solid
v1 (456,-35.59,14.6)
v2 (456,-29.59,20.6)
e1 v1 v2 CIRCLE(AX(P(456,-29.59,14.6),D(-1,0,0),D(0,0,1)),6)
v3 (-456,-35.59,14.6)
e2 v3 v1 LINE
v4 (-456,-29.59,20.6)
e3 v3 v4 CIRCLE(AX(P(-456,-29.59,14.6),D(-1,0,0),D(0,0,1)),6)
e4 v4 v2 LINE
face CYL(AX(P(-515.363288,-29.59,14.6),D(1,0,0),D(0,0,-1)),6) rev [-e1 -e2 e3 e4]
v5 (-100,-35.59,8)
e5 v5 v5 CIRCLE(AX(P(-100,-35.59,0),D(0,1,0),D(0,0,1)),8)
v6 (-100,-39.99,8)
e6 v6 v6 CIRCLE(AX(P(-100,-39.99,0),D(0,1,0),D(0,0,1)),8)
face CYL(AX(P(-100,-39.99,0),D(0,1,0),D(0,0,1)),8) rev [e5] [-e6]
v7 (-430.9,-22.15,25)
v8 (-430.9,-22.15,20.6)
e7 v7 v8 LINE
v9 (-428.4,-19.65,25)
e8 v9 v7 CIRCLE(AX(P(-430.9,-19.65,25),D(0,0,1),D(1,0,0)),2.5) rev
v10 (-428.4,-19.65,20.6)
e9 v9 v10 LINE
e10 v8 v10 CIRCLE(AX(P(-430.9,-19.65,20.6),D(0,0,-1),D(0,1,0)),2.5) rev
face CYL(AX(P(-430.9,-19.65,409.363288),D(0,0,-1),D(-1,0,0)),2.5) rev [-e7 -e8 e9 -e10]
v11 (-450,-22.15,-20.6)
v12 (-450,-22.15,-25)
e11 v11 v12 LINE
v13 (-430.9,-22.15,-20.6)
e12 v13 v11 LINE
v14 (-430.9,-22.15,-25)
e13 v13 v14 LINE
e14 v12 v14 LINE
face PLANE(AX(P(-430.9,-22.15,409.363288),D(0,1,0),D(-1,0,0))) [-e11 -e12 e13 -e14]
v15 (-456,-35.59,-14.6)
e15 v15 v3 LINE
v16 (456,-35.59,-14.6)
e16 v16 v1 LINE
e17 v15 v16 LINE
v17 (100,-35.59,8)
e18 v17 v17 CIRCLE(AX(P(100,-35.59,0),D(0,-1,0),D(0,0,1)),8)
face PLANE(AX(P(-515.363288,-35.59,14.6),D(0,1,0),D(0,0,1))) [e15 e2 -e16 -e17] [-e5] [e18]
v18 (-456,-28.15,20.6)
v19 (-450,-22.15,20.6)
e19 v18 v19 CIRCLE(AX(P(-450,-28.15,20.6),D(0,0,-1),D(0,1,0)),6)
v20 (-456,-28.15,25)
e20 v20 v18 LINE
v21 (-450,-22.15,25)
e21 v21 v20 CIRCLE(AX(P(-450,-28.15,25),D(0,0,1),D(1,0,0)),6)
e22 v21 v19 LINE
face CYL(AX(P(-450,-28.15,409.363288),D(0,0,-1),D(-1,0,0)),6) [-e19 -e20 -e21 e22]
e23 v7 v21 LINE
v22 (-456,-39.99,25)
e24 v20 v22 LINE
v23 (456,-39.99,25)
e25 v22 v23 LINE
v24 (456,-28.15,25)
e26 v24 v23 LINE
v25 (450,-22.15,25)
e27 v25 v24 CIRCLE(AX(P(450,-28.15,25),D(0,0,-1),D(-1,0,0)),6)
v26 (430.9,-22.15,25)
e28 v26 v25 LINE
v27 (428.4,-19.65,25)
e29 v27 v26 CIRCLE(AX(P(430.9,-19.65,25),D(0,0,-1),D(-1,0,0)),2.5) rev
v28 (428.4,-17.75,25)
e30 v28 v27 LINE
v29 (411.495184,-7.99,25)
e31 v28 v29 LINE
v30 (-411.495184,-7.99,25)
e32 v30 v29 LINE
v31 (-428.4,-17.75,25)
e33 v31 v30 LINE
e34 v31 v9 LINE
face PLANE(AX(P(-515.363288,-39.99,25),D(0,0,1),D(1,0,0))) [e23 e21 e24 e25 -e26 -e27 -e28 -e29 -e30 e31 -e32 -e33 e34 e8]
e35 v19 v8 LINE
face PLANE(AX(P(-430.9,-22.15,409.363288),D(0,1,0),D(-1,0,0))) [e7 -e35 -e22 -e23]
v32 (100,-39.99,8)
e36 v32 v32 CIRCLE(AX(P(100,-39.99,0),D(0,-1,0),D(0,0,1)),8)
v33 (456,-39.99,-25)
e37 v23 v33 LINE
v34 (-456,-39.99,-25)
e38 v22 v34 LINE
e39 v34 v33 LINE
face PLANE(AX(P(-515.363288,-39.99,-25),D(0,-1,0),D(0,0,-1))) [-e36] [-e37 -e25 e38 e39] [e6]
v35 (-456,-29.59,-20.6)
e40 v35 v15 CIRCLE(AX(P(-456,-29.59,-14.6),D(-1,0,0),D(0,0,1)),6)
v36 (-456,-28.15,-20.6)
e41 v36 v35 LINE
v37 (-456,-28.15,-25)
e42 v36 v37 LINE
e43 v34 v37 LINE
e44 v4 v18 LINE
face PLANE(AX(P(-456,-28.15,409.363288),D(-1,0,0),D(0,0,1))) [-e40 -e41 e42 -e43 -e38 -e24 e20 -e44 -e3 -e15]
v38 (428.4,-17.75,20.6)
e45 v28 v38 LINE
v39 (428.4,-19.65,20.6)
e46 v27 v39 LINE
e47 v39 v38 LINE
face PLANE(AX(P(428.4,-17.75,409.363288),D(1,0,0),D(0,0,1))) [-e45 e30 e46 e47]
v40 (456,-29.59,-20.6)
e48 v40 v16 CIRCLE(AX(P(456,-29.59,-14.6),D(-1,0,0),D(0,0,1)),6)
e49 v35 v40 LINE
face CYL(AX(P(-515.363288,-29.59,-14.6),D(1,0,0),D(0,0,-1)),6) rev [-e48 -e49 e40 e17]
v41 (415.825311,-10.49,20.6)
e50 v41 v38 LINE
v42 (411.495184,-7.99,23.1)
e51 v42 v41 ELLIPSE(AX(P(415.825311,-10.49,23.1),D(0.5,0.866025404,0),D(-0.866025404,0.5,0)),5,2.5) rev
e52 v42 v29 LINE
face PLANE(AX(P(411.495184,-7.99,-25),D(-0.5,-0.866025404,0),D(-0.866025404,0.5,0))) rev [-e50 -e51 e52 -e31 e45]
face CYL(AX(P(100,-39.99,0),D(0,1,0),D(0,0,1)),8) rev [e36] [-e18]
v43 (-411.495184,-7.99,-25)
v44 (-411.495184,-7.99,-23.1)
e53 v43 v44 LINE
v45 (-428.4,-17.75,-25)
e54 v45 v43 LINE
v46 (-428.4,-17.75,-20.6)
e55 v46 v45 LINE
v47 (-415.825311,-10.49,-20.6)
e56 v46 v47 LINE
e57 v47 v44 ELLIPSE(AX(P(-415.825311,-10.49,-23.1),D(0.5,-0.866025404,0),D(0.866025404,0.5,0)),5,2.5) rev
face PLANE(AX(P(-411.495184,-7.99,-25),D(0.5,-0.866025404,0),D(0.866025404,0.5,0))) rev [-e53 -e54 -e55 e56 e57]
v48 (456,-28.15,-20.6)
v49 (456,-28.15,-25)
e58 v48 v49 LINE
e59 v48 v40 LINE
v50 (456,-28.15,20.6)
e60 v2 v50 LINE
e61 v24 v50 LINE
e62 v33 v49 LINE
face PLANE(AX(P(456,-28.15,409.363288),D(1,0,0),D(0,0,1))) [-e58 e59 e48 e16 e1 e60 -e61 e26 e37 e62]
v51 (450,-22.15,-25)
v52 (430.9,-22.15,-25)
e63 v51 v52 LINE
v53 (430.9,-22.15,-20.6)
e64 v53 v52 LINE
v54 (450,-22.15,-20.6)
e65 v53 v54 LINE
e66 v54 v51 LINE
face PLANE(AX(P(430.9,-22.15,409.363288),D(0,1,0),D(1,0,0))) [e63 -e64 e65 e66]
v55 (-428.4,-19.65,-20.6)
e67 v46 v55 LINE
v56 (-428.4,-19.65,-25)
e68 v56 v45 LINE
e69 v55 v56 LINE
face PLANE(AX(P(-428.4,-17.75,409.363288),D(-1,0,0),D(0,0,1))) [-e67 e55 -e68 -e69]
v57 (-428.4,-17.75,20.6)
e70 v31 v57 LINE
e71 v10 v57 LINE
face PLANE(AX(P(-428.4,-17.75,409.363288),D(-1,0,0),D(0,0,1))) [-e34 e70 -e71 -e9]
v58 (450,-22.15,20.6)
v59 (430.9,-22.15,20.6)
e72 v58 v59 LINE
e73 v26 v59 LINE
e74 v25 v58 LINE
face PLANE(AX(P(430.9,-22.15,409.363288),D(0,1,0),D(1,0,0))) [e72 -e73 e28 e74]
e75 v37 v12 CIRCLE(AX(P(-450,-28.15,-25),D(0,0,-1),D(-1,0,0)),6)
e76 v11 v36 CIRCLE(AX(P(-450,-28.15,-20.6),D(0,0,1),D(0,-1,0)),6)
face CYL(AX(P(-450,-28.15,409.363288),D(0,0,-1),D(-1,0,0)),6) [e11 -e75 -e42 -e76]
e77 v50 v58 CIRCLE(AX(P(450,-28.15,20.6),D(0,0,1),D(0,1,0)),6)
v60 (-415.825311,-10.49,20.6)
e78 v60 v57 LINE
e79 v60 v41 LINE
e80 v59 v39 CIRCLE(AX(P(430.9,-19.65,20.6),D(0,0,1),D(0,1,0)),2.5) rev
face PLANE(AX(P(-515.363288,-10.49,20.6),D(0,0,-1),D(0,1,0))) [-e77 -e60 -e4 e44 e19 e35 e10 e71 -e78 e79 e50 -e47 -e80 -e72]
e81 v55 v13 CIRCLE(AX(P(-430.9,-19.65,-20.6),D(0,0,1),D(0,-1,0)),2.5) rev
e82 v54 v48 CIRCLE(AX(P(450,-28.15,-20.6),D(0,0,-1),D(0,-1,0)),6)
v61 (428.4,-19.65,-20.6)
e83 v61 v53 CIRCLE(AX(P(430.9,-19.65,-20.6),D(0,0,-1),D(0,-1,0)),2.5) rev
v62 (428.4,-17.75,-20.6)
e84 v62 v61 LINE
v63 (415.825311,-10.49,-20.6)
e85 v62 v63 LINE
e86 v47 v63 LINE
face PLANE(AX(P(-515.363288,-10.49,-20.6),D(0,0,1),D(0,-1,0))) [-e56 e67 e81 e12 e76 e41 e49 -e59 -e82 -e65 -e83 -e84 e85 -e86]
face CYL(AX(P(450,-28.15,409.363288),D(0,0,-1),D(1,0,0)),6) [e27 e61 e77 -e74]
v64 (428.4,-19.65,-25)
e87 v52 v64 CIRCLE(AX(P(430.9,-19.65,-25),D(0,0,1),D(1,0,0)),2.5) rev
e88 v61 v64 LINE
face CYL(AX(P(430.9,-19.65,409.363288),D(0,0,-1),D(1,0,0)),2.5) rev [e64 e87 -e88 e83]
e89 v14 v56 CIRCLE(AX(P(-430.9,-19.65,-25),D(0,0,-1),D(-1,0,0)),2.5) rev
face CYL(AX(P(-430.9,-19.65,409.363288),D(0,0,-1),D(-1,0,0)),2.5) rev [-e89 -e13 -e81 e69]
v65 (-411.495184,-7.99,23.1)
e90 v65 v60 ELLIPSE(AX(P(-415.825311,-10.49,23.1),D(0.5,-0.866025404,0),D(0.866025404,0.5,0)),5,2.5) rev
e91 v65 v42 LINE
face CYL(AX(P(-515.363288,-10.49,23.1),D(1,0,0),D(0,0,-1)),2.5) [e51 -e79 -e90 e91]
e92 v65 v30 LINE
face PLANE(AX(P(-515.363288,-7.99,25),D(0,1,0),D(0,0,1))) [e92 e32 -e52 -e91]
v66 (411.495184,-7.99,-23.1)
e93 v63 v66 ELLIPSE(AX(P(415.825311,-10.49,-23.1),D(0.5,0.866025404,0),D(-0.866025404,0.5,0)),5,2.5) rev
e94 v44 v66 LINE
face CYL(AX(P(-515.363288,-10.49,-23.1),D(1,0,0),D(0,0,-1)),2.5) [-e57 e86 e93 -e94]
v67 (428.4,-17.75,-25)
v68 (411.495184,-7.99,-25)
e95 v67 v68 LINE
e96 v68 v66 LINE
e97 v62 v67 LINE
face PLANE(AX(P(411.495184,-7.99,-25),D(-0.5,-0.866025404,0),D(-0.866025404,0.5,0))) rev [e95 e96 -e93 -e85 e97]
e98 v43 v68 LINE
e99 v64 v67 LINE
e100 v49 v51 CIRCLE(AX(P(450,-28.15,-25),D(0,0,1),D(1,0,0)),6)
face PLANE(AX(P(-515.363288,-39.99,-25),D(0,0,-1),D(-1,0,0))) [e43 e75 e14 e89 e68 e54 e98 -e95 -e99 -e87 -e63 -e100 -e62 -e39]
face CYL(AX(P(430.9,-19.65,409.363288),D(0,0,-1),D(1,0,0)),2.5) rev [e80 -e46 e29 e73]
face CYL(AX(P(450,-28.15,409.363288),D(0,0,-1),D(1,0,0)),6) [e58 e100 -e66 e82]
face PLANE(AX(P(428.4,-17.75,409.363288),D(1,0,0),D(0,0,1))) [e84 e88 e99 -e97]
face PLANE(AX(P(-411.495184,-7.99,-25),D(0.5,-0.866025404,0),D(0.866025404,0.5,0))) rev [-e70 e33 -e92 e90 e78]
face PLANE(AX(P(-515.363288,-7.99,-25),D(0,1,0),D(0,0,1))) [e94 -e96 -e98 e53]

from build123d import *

# Parameters (mm, degrees)
EXTRUDE_1_DEPTH     = 456
SKETCH_2_R          = 8
CUT_EXTRUDE_1_DEPTH = 458.51804336
OTHER_START         = -25
OTHER_1_DEPTH       = 50
CUT_EXTRUDE_2_DEPTH = 461.472800608


# Read off the part's stored shape, not the designer's step: Полость1
with BuildPart() as part:
    # Эскиз1 → Бобышка-Вытянуть1 (new body)
    with BuildSketch(Plane(origin=(0, 0, 0), x_dir=(0, 0, -1), z_dir=(1, 0, 0))):
        with BuildLine():
            Line((25, -39.99), (-25, -39.99))
            Line((-25, -39.99), (-25, -7.99))
            Line((-25, -7.99), (-23.1, -7.99))
            ThreePointArc((-23.1, -7.99), (-21.332233047, -8.722233047), (-20.6, -10.49))
            Line((-20.6, -10.49), (-20.6, -29.59))
            ThreePointArc((-20.6, -29.59), (-18.842640687, -33.832640687), (-14.6, -35.59))
            Line((-14.6, -35.59), (14.6, -35.59))
            ThreePointArc((14.6, -35.59), (18.842640687, -33.832640687), (20.6, -29.59))
            Line((20.6, -29.59), (20.6, -10.49))
            ThreePointArc((20.6, -10.49), (21.332233047, -8.722233047), (23.1, -7.99))
            Line((23.1, -7.99), (25, -7.99))
            Line((25, -7.99), (25, -39.99))
        make_face()
    extrude(amount=-EXTRUDE_1_DEPTH)

    # Эскиз2 → Вырез-Вытянуть1 (cut, through all)
    with BuildSketch(Plane(origin=(0, -35.59, 0), x_dir=(1, 0, 0), z_dir=(0, 1, 0))):
        with Locations(Location((-100, 0, 0), (0, 0, 270))):
            Circle(SKETCH_2_R)
    extrude(amount=-CUT_EXTRUDE_1_DEPTH, mode=Mode.SUBTRACT)

    # Полость1 outline → Полость1 (cut)
    with BuildSketch(Plane.XY.offset(OTHER_START)):
        with BuildLine():
            Line((-428.4, -17.75), (-456, -17.75))
            Line((-456, -17.75), (-456, -28.15))
            ThreePointArc((-456, -28.15), (-454.242640687, -23.907359313), (-450, -22.15))
            Line((-450, -22.15), (-430.9, -22.15))
            ThreePointArc((-430.9, -22.15), (-429.132233047, -21.417766953), (-428.4, -19.65))
            Line((-428.4, -19.65), (-428.4, -17.75))
        make_face()
    extrude(amount=OTHER_1_DEPTH, mode=Mode.SUBTRACT)

    # Эскиз3 → Вырез-Вытянуть2 (cut, through all)
    with BuildSketch(Plane.XY.offset(25)):
        Polygon((-456, -17.75), (-428.4, -17.75), (-411.495184118, -7.99), (-456, -7.99), align=None)
    extrude(amount=-CUT_EXTRUDE_2_DEPTH, mode=Mode.SUBTRACT)

    # Зеркальное отражение1: part across plane


with BuildPart() as part_1:
    add(part.part)
    add(part.part.mirror(Plane(origin=(0, -10.49, 23.1), x_dir=(0, 0, 1), z_dir=(-1, 0, 0))))


solid = part_1.part
